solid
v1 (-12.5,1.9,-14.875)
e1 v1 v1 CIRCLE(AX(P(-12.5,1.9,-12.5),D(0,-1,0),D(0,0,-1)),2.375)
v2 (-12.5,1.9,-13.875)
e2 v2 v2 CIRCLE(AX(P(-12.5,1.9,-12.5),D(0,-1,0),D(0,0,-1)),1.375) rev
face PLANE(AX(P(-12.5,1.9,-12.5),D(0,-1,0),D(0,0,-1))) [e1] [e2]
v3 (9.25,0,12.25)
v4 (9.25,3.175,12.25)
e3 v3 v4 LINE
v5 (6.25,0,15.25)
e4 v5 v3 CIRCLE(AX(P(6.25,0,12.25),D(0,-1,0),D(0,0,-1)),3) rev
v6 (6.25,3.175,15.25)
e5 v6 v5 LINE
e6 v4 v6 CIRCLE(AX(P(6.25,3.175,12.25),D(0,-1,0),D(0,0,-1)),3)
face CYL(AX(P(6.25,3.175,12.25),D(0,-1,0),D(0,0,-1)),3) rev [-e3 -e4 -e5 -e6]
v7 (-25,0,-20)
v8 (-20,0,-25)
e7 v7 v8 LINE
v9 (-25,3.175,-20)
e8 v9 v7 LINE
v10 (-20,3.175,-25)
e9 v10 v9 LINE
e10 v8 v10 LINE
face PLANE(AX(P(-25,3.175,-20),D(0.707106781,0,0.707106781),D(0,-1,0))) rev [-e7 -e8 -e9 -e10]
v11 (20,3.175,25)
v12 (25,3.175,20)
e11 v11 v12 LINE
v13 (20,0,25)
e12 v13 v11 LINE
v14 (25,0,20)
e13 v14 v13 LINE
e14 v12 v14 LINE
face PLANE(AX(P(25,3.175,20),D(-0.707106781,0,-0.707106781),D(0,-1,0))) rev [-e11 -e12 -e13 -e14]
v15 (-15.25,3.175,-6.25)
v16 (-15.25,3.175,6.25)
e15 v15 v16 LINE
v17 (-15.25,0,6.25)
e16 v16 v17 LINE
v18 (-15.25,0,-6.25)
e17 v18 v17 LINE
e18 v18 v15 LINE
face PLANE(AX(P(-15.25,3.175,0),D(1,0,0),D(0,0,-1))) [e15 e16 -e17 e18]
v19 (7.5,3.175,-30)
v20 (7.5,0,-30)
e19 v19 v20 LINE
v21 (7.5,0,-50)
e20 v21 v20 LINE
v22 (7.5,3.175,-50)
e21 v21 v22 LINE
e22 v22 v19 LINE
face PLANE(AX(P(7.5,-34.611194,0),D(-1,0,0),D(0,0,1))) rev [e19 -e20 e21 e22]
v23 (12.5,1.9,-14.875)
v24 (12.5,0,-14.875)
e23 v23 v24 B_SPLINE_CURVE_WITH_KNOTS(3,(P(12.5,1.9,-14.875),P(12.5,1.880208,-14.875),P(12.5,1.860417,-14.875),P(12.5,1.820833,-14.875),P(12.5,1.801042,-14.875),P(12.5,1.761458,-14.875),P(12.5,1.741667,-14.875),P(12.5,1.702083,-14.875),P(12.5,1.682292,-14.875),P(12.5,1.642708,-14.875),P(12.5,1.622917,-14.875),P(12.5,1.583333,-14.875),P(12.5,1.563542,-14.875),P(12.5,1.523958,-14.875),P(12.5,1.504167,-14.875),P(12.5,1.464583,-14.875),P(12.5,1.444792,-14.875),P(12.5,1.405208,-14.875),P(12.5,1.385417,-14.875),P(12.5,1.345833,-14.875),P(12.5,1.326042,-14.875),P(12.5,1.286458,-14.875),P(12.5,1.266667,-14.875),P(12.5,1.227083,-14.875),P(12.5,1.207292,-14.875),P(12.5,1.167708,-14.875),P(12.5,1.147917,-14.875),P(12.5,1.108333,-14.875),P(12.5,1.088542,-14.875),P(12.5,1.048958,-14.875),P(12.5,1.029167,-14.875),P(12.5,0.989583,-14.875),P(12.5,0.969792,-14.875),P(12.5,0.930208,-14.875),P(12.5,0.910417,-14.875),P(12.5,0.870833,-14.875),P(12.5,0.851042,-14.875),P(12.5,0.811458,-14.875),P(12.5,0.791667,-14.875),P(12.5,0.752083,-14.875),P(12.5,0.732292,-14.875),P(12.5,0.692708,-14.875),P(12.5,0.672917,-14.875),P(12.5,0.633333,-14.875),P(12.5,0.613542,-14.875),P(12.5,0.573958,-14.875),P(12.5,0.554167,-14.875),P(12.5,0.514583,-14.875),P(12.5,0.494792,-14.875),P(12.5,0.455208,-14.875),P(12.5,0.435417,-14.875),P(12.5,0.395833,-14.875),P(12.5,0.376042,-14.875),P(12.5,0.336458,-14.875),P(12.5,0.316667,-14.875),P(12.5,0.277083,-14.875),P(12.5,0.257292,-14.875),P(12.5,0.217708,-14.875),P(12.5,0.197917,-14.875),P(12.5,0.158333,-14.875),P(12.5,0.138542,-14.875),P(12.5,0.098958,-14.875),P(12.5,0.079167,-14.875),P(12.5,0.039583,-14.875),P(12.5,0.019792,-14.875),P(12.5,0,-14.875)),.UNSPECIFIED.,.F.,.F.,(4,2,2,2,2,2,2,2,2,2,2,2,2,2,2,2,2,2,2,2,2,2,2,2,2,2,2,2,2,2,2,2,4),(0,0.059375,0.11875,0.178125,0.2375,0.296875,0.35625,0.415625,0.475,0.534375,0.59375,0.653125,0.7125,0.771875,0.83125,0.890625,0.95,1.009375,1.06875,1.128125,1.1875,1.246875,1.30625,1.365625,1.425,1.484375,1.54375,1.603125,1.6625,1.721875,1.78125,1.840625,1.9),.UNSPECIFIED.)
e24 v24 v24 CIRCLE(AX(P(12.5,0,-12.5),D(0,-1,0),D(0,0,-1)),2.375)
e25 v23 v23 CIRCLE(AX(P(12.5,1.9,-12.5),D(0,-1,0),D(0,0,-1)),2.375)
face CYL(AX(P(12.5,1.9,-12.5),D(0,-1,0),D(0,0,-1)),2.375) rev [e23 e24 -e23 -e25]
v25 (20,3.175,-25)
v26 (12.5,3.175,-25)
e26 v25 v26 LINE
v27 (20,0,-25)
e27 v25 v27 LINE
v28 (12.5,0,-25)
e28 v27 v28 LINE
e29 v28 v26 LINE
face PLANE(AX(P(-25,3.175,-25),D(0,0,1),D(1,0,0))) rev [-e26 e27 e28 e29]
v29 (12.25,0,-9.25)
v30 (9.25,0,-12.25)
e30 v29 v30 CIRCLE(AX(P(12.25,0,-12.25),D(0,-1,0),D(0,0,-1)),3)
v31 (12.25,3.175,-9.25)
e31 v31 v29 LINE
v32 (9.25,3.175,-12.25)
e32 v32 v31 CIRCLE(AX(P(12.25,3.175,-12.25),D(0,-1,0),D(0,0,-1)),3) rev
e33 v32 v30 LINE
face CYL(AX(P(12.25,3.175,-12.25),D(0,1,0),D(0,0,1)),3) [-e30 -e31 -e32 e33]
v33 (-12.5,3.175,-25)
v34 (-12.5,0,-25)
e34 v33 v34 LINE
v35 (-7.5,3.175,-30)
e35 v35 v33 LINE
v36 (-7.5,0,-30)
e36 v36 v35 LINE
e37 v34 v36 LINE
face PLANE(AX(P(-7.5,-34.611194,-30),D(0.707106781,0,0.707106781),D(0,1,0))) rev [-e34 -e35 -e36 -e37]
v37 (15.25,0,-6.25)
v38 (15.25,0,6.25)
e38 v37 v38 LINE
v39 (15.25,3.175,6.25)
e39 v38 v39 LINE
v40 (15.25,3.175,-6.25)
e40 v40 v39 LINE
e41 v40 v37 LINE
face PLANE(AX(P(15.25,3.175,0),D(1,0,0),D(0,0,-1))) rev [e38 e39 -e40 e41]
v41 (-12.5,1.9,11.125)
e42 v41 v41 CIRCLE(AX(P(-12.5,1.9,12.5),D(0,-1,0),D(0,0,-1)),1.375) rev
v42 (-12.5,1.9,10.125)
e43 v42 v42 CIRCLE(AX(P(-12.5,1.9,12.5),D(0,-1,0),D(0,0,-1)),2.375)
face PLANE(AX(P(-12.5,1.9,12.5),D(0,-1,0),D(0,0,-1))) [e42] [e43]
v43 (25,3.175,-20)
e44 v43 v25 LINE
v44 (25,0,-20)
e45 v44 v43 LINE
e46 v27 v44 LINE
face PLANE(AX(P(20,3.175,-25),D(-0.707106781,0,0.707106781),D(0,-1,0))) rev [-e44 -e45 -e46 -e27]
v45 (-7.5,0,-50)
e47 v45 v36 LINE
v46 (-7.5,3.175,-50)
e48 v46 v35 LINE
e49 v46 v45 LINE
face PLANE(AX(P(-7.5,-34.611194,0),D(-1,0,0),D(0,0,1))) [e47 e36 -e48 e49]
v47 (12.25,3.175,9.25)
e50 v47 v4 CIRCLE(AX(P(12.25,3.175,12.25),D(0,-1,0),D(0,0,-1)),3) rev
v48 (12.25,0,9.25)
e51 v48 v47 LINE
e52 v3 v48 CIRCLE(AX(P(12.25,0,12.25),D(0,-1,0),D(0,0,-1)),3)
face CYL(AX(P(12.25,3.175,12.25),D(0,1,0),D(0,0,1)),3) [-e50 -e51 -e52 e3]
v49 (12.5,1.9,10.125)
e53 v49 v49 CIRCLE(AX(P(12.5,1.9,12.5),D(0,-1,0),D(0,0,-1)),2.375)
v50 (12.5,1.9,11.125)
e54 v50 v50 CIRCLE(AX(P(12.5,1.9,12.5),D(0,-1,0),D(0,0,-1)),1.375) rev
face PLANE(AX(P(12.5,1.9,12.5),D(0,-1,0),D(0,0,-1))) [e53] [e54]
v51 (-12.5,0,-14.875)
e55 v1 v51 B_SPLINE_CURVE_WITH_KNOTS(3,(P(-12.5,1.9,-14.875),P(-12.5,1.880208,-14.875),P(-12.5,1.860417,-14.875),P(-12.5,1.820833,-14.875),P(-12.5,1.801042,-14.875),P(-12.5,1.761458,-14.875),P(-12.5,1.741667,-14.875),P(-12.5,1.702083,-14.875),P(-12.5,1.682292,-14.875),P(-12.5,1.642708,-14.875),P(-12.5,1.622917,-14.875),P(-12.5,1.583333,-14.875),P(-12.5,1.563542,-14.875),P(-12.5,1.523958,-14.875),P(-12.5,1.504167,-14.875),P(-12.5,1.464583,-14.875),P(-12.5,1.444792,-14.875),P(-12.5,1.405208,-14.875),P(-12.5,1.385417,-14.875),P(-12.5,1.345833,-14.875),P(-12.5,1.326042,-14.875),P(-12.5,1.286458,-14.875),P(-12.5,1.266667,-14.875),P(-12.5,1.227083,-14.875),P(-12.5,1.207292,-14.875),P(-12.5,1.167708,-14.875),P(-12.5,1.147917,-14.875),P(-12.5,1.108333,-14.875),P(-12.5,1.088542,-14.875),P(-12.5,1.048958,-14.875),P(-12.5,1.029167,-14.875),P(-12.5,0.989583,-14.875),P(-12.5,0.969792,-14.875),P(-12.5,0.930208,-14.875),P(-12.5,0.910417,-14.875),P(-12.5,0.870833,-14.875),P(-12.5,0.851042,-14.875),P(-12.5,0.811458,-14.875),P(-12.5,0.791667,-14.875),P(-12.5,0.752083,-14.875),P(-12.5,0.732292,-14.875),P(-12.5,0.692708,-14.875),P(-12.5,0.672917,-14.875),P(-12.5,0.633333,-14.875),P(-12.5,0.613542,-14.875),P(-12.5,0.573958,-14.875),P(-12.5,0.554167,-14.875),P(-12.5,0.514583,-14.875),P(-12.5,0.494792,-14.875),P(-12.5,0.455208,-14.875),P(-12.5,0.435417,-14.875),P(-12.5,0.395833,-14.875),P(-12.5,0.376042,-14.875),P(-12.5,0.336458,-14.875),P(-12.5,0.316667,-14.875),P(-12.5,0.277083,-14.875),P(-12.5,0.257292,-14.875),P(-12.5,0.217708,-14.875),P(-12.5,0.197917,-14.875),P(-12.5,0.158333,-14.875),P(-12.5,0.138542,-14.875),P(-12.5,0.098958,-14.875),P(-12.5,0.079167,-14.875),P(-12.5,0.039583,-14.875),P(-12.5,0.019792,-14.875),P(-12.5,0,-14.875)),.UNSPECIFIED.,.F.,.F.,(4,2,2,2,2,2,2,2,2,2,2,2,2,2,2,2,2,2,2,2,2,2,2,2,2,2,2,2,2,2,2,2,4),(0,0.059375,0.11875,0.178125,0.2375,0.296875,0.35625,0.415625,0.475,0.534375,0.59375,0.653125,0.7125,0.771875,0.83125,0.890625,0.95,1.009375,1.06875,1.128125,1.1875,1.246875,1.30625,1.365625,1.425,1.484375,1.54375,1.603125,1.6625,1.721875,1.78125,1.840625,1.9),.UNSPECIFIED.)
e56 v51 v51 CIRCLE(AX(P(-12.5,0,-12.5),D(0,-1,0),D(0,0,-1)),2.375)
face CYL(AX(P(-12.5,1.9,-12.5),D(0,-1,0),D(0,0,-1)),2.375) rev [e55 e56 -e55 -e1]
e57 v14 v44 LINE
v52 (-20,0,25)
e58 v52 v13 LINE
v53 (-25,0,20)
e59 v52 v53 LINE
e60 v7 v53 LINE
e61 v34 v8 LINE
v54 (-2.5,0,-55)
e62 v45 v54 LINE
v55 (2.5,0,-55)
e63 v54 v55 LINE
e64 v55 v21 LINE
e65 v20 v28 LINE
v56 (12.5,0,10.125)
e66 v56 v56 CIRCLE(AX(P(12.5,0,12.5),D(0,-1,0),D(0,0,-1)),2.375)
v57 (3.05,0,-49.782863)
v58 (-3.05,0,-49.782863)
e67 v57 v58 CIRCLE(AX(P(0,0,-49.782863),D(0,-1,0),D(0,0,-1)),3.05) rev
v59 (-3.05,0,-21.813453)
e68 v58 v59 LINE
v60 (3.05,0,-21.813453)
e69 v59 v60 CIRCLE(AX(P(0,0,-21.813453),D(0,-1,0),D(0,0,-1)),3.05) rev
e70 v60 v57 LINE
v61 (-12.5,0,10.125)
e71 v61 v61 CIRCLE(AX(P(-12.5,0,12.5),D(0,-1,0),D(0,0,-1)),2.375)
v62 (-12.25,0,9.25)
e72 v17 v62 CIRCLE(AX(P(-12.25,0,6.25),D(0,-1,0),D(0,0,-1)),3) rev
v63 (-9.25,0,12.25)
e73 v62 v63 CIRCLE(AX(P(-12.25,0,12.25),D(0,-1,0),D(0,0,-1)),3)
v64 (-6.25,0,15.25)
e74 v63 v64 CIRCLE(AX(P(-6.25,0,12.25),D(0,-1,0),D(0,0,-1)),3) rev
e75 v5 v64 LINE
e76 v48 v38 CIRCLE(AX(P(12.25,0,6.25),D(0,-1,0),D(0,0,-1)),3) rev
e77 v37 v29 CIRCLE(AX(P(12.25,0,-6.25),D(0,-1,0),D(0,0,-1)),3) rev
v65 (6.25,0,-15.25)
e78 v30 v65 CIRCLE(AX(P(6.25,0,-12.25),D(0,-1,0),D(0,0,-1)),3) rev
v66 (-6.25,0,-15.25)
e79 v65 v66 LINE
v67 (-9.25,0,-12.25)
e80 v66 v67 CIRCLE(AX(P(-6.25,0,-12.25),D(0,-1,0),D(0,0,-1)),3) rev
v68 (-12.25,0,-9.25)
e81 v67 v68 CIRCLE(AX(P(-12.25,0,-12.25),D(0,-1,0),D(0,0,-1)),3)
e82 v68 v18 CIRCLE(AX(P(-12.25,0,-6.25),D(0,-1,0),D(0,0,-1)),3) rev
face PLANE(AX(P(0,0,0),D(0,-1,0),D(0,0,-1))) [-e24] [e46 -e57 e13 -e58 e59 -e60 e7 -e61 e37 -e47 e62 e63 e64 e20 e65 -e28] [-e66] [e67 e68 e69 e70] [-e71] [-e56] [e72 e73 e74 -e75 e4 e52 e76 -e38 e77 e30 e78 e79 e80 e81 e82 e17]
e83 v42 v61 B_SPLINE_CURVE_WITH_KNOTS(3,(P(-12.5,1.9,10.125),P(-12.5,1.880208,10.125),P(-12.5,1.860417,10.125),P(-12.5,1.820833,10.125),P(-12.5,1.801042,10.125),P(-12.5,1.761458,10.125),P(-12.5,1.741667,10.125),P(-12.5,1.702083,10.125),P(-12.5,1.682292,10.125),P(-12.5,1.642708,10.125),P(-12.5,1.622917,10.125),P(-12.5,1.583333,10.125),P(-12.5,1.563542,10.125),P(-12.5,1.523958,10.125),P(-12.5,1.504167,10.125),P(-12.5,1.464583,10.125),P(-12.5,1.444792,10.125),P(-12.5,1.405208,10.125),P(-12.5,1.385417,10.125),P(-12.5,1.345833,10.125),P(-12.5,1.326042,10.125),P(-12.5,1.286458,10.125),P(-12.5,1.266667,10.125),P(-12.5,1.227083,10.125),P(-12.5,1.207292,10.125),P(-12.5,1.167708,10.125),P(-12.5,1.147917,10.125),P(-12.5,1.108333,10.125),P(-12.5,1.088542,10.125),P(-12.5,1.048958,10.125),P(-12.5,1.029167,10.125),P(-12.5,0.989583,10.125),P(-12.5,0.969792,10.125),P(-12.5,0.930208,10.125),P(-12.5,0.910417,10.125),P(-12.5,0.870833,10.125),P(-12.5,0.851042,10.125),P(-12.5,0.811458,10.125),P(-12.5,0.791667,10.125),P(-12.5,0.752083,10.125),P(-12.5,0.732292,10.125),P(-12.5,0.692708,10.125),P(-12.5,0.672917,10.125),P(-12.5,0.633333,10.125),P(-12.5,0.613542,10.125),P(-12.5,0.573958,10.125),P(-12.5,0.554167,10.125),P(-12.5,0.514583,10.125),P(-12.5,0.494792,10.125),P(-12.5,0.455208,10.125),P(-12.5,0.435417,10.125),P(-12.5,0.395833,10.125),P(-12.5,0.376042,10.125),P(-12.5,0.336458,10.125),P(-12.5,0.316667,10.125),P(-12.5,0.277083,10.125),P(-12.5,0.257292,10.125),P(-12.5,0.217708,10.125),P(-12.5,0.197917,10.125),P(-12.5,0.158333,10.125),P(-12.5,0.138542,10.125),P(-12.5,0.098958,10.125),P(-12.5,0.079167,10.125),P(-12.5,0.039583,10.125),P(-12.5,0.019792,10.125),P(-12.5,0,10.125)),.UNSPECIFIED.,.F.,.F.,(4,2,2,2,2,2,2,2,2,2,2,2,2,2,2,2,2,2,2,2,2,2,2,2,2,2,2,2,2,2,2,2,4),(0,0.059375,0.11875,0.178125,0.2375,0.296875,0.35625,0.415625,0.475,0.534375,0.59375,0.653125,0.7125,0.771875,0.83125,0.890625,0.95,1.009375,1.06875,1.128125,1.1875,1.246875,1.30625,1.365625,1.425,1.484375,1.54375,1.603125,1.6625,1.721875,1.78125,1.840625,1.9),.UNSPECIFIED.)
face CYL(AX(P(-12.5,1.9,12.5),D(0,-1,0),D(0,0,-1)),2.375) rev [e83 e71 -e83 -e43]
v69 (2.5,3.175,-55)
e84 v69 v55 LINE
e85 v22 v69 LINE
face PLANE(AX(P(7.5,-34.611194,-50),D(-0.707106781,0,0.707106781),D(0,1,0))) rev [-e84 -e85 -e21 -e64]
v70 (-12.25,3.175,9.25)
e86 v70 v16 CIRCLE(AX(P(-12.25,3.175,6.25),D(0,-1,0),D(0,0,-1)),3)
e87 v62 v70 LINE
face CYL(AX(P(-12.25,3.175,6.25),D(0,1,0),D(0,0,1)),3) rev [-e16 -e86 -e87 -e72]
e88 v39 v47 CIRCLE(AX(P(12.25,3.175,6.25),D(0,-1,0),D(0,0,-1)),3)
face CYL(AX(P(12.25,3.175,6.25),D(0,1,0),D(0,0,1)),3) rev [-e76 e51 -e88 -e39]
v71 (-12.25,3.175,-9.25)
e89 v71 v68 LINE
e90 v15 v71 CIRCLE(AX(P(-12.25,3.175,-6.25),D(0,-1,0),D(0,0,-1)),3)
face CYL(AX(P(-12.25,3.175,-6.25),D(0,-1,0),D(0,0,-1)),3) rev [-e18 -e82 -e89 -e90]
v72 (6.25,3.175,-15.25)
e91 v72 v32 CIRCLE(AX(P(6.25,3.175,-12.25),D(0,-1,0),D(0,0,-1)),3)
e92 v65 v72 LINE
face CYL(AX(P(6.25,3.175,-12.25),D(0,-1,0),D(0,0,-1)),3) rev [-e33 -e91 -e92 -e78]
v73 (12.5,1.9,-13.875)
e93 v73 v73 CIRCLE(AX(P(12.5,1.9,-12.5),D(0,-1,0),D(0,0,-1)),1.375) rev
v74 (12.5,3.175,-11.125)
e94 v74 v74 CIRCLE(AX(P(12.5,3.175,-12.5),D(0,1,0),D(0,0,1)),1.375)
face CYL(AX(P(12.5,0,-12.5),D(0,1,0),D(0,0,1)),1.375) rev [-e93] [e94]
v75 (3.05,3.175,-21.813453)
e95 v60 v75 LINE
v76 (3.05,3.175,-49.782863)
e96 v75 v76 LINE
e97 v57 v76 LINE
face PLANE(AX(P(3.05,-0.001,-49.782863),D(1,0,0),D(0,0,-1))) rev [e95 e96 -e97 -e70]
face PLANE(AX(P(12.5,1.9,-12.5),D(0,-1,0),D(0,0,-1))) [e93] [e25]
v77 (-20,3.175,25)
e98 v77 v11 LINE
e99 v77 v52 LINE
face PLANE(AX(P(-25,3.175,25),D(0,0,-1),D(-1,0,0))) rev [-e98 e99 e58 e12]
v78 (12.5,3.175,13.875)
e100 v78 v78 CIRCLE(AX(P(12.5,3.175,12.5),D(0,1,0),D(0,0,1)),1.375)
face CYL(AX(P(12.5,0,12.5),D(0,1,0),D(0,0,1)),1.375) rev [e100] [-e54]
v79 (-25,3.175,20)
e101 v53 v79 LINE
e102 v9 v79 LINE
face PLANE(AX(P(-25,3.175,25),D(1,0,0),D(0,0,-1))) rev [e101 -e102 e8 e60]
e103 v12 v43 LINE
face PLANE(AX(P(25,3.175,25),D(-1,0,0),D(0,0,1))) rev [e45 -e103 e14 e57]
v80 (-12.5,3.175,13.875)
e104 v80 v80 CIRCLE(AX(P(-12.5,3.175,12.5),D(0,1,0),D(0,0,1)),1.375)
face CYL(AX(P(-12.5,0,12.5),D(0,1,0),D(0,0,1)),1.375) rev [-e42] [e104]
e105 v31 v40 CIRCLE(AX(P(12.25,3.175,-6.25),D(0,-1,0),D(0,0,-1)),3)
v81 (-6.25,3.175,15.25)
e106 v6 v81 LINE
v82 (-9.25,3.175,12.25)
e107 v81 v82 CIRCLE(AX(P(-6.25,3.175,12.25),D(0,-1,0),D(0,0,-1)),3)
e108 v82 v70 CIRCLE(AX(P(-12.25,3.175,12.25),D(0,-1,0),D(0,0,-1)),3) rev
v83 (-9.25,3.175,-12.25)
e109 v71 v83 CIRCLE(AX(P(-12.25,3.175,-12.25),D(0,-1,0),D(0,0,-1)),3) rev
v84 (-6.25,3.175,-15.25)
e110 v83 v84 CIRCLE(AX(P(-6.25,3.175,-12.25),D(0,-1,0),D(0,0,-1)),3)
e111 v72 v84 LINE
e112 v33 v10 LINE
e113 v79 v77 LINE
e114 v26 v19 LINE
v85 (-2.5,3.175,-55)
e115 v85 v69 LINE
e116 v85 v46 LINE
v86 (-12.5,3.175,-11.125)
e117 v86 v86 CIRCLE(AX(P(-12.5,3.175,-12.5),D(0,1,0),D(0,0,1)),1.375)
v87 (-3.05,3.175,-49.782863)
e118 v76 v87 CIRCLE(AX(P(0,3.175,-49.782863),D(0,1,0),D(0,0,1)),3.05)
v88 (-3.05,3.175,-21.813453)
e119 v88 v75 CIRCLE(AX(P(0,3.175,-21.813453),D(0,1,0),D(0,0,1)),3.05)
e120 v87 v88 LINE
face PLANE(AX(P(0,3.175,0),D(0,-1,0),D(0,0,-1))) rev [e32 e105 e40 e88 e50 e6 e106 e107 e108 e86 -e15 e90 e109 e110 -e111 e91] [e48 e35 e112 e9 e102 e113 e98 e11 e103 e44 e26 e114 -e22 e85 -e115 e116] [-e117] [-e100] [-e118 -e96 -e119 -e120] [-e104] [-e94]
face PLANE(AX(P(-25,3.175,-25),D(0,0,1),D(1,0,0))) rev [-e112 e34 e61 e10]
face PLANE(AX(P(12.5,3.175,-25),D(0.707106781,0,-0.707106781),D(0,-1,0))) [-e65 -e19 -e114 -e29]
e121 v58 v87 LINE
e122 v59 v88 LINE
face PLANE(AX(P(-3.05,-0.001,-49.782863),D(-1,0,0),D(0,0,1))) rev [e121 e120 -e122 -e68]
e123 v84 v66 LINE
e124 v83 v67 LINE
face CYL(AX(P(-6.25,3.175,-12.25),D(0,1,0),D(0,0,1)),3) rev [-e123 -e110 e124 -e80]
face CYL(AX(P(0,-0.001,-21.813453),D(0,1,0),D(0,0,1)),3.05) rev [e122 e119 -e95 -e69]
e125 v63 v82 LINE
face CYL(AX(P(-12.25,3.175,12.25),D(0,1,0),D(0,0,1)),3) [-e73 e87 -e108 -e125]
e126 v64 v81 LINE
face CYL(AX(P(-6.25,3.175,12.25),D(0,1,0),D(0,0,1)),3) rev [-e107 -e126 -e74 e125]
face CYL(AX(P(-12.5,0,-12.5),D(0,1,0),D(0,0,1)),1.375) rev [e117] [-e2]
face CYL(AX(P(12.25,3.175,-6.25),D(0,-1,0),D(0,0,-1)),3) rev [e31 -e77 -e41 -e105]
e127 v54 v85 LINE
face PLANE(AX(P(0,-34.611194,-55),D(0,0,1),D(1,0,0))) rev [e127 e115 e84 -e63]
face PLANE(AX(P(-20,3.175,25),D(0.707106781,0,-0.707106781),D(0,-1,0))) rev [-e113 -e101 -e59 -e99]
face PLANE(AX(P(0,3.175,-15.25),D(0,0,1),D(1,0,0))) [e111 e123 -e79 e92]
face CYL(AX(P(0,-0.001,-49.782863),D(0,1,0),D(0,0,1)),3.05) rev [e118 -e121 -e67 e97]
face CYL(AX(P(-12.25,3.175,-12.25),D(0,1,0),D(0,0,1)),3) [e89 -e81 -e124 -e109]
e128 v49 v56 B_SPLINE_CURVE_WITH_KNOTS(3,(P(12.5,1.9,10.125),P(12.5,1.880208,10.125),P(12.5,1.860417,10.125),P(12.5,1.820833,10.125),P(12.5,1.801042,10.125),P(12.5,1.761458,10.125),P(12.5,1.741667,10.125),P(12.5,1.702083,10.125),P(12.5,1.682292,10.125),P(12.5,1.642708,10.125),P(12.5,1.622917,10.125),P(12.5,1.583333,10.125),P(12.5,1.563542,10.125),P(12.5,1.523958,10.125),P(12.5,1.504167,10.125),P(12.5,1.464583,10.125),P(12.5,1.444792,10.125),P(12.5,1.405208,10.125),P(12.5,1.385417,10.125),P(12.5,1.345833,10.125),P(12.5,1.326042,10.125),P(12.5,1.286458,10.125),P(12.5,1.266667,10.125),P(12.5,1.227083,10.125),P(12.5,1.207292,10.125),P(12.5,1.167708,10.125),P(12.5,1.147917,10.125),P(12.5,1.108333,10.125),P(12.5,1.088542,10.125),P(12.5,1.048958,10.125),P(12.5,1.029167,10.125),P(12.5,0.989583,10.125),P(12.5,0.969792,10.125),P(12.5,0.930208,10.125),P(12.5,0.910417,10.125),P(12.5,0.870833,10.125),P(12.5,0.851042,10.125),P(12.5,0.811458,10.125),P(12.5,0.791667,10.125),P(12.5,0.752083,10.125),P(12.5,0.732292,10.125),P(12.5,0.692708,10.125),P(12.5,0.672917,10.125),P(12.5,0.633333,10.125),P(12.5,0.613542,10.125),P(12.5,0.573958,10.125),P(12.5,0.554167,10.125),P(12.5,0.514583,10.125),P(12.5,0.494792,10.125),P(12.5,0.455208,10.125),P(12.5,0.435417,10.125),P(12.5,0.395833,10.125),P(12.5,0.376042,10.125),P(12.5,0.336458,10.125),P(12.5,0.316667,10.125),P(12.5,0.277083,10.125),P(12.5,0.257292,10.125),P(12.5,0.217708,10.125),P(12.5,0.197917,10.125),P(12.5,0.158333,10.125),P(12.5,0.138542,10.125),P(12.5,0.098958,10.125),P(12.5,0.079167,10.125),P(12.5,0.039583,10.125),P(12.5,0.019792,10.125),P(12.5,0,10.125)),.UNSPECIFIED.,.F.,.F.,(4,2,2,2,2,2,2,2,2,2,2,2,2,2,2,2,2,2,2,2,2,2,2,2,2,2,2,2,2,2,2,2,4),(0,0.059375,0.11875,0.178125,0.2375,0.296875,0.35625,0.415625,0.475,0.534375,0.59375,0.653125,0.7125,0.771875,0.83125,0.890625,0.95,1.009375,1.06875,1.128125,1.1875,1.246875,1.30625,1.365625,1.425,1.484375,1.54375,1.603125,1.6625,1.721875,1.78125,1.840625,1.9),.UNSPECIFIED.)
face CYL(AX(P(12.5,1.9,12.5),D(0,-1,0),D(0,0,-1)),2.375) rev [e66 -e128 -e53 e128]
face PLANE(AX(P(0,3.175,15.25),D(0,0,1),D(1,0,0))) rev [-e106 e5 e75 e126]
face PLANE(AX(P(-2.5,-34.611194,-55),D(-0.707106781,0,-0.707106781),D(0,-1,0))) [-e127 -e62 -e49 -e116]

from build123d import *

# Parameters (mm, degrees)
SKETCH2_W           = 50
SKETCH2_H           = 50
BOSS_EXTRUDE1_DEPTH = 3.175
SKETCH3_R           = 1.375
CUT_EXTRUDE1_DEPTH  = 36.497614356
SKETCH5_R           = 2.375
CUT_EXTRUDE3_DEPTH  = 1.9
CUT_EXTRUDE9_DEPTH  = 36.497614356
FILLET1_R           = 3
SKETCH11_W          = 15
SKETCH11_H          = 30
BOSS_EXTRUDE2_DEPTH = 3.175
CUT_EXTRUDE10_REACH = 62.499
CHAMFER1_SIZE       = 5


with BuildPart() as part:
    # Sketch2 → Boss-Extrude1 (new body)
    with BuildSketch(Plane(origin=(0, 0, 0), x_dir=(1, 0, 0), z_dir=(0, 1, 0))):
        Rectangle(SKETCH2_W, SKETCH2_H)
    extrude(amount=BOSS_EXTRUDE1_DEPTH)

    # Sketch3 → Cut-Extrude1 (cut, through all)
    with BuildSketch(Plane(origin=(0, 3.175, 0), x_dir=(1, 0, 0), z_dir=(0, 1, 0))):
        with Locations(Location((12.5, 12.5, 0), (0, 0, 270))):
            Circle(SKETCH3_R)
        with Locations(Location((-12.5, 12.5, 0), (0, 0, 270))):
            Circle(SKETCH3_R)
        with Locations(Location((-12.5, -12.5, 0), (0, 0, 270))):
            Circle(SKETCH3_R)
        with Locations(Location((12.5, -12.5, 0), (0, 0, 270))):
            Circle(SKETCH3_R)
    extrude(amount=-CUT_EXTRUDE1_DEPTH, mode=Mode.SUBTRACT)

    # Sketch5 → Cut-Extrude3 (cut)
    with BuildSketch(Plane.XZ):
        with Locations(Location((12.5, 12.5, 0), (0, 0, 270))):
            Circle(SKETCH5_R)
        with Locations(Location((-12.5, 12.5, 0), (0, 0, 270))):
            Circle(SKETCH5_R)
        with Locations(Location((12.5, -12.5, 0), (0, 0, 270))):
            Circle(SKETCH5_R)
        with Locations(Location((-12.5, -12.5, 0), (0, 0, 270))):
            Circle(SKETCH5_R)
    extrude(amount=-CUT_EXTRUDE3_DEPTH, mode=Mode.SUBTRACT)

    # Sketch10 → Cut-Extrude9 (cut, through all)
    with BuildSketch(Plane.XZ):
        Polygon((-9.25, -15.25), (9.25, -15.25), (9.25, -9.25), (15.25, -9.25), (15.25, 9.25), (9.25, 9.25), (9.25, 15.25), (-9.25, 15.25), (-9.25, 9.25), (-15.25, 9.25), (-15.25, -9.25), (-9.25, -9.25), align=None)
    extrude(amount=-CUT_EXTRUDE9_DEPTH, mode=Mode.SUBTRACT)

    # Fillet1
    fillet1_edges = [part.edges().sort_by_distance(p)[0] for p in [
        (15.25, 1.5875, -9.25),
        (15.25, 1.5875, 9.25),
        (-9.25, 1.5875, -15.25),
        (9.25, 1.5875, -15.25),
        (9.25, 1.5875, 15.25),
        (-9.25, 1.5875, 15.25),
        (-15.25, 1.5875, 9.25),
        (-15.25, 1.5875, -9.25),
        (9.25, 1.5875, 9.25),
        (-9.25, 1.5875, 9.25),
        (9.25, 1.5875, -9.25),
        (-9.25, 1.5875, -9.25),
    ]]
    fillet(fillet1_edges, radius=FILLET1_R - 0.0001)  # a hair under: the kernel refuses the full size

    # Sketch11 → Boss-Extrude2 (add)
    with BuildSketch(Plane(origin=(0, 3.175, 0), x_dir=(1, 0, 0), z_dir=(0, 1, 0))):
        with Locations((0, 40)):
            Rectangle(SKETCH11_W, SKETCH11_H)
    extrude(amount=-BOSS_EXTRUDE2_DEPTH)

    # Sketch13 → Cut-Extrude10 (cut, up to next)
    with BuildSketch(Plane(origin=(0, 3.175, 0), x_dir=(1, 0, 0), z_dir=(0, 1, 0)), mode=Mode.PRIVATE) as cut_extrude10_sk1:
        with BuildLine():
            Line((-3.05, 49.782863058), (-3.05, 21.813452658))
            ThreePointArc((-3.05, 21.813452658), (0, 18.763452658), (3.05, 21.813452658))
            Line((3.05, 21.813452658), (3.05, 49.782863058))
            ThreePointArc((3.05, 49.782863058), (0, 52.832863058), (-3.05, 49.782863058))
        make_face()
    cut_extrude10_tool1 = extrude(cut_extrude10_sk1.sketch, amount=-CUT_EXTRUDE10_REACH, mode=Mode.PRIVATE) & part.part
    add(cut_extrude10_tool1.solids().sort_by_distance((0, 3.175, -35.798158))[0], mode=Mode.SUBTRACT)

    # Chamfer1
    chamfer1_edges = [part.edges().sort_by_distance(p)[0] for p in [
        (7.5, 1.5875, -25),
        (7.5, 1.5875, -55),
        (-7.5, 1.5875, -55),
        (-7.5, 1.5875, -25),
        (25, 1.5875, 25),
        (-25, 1.5875, 25),
        (-25, 1.5875, -25),
        (25, 1.5875, -25),
    ]]
    chamfer(chamfer1_edges, length=CHAMFER1_SIZE)


solid = part.part
